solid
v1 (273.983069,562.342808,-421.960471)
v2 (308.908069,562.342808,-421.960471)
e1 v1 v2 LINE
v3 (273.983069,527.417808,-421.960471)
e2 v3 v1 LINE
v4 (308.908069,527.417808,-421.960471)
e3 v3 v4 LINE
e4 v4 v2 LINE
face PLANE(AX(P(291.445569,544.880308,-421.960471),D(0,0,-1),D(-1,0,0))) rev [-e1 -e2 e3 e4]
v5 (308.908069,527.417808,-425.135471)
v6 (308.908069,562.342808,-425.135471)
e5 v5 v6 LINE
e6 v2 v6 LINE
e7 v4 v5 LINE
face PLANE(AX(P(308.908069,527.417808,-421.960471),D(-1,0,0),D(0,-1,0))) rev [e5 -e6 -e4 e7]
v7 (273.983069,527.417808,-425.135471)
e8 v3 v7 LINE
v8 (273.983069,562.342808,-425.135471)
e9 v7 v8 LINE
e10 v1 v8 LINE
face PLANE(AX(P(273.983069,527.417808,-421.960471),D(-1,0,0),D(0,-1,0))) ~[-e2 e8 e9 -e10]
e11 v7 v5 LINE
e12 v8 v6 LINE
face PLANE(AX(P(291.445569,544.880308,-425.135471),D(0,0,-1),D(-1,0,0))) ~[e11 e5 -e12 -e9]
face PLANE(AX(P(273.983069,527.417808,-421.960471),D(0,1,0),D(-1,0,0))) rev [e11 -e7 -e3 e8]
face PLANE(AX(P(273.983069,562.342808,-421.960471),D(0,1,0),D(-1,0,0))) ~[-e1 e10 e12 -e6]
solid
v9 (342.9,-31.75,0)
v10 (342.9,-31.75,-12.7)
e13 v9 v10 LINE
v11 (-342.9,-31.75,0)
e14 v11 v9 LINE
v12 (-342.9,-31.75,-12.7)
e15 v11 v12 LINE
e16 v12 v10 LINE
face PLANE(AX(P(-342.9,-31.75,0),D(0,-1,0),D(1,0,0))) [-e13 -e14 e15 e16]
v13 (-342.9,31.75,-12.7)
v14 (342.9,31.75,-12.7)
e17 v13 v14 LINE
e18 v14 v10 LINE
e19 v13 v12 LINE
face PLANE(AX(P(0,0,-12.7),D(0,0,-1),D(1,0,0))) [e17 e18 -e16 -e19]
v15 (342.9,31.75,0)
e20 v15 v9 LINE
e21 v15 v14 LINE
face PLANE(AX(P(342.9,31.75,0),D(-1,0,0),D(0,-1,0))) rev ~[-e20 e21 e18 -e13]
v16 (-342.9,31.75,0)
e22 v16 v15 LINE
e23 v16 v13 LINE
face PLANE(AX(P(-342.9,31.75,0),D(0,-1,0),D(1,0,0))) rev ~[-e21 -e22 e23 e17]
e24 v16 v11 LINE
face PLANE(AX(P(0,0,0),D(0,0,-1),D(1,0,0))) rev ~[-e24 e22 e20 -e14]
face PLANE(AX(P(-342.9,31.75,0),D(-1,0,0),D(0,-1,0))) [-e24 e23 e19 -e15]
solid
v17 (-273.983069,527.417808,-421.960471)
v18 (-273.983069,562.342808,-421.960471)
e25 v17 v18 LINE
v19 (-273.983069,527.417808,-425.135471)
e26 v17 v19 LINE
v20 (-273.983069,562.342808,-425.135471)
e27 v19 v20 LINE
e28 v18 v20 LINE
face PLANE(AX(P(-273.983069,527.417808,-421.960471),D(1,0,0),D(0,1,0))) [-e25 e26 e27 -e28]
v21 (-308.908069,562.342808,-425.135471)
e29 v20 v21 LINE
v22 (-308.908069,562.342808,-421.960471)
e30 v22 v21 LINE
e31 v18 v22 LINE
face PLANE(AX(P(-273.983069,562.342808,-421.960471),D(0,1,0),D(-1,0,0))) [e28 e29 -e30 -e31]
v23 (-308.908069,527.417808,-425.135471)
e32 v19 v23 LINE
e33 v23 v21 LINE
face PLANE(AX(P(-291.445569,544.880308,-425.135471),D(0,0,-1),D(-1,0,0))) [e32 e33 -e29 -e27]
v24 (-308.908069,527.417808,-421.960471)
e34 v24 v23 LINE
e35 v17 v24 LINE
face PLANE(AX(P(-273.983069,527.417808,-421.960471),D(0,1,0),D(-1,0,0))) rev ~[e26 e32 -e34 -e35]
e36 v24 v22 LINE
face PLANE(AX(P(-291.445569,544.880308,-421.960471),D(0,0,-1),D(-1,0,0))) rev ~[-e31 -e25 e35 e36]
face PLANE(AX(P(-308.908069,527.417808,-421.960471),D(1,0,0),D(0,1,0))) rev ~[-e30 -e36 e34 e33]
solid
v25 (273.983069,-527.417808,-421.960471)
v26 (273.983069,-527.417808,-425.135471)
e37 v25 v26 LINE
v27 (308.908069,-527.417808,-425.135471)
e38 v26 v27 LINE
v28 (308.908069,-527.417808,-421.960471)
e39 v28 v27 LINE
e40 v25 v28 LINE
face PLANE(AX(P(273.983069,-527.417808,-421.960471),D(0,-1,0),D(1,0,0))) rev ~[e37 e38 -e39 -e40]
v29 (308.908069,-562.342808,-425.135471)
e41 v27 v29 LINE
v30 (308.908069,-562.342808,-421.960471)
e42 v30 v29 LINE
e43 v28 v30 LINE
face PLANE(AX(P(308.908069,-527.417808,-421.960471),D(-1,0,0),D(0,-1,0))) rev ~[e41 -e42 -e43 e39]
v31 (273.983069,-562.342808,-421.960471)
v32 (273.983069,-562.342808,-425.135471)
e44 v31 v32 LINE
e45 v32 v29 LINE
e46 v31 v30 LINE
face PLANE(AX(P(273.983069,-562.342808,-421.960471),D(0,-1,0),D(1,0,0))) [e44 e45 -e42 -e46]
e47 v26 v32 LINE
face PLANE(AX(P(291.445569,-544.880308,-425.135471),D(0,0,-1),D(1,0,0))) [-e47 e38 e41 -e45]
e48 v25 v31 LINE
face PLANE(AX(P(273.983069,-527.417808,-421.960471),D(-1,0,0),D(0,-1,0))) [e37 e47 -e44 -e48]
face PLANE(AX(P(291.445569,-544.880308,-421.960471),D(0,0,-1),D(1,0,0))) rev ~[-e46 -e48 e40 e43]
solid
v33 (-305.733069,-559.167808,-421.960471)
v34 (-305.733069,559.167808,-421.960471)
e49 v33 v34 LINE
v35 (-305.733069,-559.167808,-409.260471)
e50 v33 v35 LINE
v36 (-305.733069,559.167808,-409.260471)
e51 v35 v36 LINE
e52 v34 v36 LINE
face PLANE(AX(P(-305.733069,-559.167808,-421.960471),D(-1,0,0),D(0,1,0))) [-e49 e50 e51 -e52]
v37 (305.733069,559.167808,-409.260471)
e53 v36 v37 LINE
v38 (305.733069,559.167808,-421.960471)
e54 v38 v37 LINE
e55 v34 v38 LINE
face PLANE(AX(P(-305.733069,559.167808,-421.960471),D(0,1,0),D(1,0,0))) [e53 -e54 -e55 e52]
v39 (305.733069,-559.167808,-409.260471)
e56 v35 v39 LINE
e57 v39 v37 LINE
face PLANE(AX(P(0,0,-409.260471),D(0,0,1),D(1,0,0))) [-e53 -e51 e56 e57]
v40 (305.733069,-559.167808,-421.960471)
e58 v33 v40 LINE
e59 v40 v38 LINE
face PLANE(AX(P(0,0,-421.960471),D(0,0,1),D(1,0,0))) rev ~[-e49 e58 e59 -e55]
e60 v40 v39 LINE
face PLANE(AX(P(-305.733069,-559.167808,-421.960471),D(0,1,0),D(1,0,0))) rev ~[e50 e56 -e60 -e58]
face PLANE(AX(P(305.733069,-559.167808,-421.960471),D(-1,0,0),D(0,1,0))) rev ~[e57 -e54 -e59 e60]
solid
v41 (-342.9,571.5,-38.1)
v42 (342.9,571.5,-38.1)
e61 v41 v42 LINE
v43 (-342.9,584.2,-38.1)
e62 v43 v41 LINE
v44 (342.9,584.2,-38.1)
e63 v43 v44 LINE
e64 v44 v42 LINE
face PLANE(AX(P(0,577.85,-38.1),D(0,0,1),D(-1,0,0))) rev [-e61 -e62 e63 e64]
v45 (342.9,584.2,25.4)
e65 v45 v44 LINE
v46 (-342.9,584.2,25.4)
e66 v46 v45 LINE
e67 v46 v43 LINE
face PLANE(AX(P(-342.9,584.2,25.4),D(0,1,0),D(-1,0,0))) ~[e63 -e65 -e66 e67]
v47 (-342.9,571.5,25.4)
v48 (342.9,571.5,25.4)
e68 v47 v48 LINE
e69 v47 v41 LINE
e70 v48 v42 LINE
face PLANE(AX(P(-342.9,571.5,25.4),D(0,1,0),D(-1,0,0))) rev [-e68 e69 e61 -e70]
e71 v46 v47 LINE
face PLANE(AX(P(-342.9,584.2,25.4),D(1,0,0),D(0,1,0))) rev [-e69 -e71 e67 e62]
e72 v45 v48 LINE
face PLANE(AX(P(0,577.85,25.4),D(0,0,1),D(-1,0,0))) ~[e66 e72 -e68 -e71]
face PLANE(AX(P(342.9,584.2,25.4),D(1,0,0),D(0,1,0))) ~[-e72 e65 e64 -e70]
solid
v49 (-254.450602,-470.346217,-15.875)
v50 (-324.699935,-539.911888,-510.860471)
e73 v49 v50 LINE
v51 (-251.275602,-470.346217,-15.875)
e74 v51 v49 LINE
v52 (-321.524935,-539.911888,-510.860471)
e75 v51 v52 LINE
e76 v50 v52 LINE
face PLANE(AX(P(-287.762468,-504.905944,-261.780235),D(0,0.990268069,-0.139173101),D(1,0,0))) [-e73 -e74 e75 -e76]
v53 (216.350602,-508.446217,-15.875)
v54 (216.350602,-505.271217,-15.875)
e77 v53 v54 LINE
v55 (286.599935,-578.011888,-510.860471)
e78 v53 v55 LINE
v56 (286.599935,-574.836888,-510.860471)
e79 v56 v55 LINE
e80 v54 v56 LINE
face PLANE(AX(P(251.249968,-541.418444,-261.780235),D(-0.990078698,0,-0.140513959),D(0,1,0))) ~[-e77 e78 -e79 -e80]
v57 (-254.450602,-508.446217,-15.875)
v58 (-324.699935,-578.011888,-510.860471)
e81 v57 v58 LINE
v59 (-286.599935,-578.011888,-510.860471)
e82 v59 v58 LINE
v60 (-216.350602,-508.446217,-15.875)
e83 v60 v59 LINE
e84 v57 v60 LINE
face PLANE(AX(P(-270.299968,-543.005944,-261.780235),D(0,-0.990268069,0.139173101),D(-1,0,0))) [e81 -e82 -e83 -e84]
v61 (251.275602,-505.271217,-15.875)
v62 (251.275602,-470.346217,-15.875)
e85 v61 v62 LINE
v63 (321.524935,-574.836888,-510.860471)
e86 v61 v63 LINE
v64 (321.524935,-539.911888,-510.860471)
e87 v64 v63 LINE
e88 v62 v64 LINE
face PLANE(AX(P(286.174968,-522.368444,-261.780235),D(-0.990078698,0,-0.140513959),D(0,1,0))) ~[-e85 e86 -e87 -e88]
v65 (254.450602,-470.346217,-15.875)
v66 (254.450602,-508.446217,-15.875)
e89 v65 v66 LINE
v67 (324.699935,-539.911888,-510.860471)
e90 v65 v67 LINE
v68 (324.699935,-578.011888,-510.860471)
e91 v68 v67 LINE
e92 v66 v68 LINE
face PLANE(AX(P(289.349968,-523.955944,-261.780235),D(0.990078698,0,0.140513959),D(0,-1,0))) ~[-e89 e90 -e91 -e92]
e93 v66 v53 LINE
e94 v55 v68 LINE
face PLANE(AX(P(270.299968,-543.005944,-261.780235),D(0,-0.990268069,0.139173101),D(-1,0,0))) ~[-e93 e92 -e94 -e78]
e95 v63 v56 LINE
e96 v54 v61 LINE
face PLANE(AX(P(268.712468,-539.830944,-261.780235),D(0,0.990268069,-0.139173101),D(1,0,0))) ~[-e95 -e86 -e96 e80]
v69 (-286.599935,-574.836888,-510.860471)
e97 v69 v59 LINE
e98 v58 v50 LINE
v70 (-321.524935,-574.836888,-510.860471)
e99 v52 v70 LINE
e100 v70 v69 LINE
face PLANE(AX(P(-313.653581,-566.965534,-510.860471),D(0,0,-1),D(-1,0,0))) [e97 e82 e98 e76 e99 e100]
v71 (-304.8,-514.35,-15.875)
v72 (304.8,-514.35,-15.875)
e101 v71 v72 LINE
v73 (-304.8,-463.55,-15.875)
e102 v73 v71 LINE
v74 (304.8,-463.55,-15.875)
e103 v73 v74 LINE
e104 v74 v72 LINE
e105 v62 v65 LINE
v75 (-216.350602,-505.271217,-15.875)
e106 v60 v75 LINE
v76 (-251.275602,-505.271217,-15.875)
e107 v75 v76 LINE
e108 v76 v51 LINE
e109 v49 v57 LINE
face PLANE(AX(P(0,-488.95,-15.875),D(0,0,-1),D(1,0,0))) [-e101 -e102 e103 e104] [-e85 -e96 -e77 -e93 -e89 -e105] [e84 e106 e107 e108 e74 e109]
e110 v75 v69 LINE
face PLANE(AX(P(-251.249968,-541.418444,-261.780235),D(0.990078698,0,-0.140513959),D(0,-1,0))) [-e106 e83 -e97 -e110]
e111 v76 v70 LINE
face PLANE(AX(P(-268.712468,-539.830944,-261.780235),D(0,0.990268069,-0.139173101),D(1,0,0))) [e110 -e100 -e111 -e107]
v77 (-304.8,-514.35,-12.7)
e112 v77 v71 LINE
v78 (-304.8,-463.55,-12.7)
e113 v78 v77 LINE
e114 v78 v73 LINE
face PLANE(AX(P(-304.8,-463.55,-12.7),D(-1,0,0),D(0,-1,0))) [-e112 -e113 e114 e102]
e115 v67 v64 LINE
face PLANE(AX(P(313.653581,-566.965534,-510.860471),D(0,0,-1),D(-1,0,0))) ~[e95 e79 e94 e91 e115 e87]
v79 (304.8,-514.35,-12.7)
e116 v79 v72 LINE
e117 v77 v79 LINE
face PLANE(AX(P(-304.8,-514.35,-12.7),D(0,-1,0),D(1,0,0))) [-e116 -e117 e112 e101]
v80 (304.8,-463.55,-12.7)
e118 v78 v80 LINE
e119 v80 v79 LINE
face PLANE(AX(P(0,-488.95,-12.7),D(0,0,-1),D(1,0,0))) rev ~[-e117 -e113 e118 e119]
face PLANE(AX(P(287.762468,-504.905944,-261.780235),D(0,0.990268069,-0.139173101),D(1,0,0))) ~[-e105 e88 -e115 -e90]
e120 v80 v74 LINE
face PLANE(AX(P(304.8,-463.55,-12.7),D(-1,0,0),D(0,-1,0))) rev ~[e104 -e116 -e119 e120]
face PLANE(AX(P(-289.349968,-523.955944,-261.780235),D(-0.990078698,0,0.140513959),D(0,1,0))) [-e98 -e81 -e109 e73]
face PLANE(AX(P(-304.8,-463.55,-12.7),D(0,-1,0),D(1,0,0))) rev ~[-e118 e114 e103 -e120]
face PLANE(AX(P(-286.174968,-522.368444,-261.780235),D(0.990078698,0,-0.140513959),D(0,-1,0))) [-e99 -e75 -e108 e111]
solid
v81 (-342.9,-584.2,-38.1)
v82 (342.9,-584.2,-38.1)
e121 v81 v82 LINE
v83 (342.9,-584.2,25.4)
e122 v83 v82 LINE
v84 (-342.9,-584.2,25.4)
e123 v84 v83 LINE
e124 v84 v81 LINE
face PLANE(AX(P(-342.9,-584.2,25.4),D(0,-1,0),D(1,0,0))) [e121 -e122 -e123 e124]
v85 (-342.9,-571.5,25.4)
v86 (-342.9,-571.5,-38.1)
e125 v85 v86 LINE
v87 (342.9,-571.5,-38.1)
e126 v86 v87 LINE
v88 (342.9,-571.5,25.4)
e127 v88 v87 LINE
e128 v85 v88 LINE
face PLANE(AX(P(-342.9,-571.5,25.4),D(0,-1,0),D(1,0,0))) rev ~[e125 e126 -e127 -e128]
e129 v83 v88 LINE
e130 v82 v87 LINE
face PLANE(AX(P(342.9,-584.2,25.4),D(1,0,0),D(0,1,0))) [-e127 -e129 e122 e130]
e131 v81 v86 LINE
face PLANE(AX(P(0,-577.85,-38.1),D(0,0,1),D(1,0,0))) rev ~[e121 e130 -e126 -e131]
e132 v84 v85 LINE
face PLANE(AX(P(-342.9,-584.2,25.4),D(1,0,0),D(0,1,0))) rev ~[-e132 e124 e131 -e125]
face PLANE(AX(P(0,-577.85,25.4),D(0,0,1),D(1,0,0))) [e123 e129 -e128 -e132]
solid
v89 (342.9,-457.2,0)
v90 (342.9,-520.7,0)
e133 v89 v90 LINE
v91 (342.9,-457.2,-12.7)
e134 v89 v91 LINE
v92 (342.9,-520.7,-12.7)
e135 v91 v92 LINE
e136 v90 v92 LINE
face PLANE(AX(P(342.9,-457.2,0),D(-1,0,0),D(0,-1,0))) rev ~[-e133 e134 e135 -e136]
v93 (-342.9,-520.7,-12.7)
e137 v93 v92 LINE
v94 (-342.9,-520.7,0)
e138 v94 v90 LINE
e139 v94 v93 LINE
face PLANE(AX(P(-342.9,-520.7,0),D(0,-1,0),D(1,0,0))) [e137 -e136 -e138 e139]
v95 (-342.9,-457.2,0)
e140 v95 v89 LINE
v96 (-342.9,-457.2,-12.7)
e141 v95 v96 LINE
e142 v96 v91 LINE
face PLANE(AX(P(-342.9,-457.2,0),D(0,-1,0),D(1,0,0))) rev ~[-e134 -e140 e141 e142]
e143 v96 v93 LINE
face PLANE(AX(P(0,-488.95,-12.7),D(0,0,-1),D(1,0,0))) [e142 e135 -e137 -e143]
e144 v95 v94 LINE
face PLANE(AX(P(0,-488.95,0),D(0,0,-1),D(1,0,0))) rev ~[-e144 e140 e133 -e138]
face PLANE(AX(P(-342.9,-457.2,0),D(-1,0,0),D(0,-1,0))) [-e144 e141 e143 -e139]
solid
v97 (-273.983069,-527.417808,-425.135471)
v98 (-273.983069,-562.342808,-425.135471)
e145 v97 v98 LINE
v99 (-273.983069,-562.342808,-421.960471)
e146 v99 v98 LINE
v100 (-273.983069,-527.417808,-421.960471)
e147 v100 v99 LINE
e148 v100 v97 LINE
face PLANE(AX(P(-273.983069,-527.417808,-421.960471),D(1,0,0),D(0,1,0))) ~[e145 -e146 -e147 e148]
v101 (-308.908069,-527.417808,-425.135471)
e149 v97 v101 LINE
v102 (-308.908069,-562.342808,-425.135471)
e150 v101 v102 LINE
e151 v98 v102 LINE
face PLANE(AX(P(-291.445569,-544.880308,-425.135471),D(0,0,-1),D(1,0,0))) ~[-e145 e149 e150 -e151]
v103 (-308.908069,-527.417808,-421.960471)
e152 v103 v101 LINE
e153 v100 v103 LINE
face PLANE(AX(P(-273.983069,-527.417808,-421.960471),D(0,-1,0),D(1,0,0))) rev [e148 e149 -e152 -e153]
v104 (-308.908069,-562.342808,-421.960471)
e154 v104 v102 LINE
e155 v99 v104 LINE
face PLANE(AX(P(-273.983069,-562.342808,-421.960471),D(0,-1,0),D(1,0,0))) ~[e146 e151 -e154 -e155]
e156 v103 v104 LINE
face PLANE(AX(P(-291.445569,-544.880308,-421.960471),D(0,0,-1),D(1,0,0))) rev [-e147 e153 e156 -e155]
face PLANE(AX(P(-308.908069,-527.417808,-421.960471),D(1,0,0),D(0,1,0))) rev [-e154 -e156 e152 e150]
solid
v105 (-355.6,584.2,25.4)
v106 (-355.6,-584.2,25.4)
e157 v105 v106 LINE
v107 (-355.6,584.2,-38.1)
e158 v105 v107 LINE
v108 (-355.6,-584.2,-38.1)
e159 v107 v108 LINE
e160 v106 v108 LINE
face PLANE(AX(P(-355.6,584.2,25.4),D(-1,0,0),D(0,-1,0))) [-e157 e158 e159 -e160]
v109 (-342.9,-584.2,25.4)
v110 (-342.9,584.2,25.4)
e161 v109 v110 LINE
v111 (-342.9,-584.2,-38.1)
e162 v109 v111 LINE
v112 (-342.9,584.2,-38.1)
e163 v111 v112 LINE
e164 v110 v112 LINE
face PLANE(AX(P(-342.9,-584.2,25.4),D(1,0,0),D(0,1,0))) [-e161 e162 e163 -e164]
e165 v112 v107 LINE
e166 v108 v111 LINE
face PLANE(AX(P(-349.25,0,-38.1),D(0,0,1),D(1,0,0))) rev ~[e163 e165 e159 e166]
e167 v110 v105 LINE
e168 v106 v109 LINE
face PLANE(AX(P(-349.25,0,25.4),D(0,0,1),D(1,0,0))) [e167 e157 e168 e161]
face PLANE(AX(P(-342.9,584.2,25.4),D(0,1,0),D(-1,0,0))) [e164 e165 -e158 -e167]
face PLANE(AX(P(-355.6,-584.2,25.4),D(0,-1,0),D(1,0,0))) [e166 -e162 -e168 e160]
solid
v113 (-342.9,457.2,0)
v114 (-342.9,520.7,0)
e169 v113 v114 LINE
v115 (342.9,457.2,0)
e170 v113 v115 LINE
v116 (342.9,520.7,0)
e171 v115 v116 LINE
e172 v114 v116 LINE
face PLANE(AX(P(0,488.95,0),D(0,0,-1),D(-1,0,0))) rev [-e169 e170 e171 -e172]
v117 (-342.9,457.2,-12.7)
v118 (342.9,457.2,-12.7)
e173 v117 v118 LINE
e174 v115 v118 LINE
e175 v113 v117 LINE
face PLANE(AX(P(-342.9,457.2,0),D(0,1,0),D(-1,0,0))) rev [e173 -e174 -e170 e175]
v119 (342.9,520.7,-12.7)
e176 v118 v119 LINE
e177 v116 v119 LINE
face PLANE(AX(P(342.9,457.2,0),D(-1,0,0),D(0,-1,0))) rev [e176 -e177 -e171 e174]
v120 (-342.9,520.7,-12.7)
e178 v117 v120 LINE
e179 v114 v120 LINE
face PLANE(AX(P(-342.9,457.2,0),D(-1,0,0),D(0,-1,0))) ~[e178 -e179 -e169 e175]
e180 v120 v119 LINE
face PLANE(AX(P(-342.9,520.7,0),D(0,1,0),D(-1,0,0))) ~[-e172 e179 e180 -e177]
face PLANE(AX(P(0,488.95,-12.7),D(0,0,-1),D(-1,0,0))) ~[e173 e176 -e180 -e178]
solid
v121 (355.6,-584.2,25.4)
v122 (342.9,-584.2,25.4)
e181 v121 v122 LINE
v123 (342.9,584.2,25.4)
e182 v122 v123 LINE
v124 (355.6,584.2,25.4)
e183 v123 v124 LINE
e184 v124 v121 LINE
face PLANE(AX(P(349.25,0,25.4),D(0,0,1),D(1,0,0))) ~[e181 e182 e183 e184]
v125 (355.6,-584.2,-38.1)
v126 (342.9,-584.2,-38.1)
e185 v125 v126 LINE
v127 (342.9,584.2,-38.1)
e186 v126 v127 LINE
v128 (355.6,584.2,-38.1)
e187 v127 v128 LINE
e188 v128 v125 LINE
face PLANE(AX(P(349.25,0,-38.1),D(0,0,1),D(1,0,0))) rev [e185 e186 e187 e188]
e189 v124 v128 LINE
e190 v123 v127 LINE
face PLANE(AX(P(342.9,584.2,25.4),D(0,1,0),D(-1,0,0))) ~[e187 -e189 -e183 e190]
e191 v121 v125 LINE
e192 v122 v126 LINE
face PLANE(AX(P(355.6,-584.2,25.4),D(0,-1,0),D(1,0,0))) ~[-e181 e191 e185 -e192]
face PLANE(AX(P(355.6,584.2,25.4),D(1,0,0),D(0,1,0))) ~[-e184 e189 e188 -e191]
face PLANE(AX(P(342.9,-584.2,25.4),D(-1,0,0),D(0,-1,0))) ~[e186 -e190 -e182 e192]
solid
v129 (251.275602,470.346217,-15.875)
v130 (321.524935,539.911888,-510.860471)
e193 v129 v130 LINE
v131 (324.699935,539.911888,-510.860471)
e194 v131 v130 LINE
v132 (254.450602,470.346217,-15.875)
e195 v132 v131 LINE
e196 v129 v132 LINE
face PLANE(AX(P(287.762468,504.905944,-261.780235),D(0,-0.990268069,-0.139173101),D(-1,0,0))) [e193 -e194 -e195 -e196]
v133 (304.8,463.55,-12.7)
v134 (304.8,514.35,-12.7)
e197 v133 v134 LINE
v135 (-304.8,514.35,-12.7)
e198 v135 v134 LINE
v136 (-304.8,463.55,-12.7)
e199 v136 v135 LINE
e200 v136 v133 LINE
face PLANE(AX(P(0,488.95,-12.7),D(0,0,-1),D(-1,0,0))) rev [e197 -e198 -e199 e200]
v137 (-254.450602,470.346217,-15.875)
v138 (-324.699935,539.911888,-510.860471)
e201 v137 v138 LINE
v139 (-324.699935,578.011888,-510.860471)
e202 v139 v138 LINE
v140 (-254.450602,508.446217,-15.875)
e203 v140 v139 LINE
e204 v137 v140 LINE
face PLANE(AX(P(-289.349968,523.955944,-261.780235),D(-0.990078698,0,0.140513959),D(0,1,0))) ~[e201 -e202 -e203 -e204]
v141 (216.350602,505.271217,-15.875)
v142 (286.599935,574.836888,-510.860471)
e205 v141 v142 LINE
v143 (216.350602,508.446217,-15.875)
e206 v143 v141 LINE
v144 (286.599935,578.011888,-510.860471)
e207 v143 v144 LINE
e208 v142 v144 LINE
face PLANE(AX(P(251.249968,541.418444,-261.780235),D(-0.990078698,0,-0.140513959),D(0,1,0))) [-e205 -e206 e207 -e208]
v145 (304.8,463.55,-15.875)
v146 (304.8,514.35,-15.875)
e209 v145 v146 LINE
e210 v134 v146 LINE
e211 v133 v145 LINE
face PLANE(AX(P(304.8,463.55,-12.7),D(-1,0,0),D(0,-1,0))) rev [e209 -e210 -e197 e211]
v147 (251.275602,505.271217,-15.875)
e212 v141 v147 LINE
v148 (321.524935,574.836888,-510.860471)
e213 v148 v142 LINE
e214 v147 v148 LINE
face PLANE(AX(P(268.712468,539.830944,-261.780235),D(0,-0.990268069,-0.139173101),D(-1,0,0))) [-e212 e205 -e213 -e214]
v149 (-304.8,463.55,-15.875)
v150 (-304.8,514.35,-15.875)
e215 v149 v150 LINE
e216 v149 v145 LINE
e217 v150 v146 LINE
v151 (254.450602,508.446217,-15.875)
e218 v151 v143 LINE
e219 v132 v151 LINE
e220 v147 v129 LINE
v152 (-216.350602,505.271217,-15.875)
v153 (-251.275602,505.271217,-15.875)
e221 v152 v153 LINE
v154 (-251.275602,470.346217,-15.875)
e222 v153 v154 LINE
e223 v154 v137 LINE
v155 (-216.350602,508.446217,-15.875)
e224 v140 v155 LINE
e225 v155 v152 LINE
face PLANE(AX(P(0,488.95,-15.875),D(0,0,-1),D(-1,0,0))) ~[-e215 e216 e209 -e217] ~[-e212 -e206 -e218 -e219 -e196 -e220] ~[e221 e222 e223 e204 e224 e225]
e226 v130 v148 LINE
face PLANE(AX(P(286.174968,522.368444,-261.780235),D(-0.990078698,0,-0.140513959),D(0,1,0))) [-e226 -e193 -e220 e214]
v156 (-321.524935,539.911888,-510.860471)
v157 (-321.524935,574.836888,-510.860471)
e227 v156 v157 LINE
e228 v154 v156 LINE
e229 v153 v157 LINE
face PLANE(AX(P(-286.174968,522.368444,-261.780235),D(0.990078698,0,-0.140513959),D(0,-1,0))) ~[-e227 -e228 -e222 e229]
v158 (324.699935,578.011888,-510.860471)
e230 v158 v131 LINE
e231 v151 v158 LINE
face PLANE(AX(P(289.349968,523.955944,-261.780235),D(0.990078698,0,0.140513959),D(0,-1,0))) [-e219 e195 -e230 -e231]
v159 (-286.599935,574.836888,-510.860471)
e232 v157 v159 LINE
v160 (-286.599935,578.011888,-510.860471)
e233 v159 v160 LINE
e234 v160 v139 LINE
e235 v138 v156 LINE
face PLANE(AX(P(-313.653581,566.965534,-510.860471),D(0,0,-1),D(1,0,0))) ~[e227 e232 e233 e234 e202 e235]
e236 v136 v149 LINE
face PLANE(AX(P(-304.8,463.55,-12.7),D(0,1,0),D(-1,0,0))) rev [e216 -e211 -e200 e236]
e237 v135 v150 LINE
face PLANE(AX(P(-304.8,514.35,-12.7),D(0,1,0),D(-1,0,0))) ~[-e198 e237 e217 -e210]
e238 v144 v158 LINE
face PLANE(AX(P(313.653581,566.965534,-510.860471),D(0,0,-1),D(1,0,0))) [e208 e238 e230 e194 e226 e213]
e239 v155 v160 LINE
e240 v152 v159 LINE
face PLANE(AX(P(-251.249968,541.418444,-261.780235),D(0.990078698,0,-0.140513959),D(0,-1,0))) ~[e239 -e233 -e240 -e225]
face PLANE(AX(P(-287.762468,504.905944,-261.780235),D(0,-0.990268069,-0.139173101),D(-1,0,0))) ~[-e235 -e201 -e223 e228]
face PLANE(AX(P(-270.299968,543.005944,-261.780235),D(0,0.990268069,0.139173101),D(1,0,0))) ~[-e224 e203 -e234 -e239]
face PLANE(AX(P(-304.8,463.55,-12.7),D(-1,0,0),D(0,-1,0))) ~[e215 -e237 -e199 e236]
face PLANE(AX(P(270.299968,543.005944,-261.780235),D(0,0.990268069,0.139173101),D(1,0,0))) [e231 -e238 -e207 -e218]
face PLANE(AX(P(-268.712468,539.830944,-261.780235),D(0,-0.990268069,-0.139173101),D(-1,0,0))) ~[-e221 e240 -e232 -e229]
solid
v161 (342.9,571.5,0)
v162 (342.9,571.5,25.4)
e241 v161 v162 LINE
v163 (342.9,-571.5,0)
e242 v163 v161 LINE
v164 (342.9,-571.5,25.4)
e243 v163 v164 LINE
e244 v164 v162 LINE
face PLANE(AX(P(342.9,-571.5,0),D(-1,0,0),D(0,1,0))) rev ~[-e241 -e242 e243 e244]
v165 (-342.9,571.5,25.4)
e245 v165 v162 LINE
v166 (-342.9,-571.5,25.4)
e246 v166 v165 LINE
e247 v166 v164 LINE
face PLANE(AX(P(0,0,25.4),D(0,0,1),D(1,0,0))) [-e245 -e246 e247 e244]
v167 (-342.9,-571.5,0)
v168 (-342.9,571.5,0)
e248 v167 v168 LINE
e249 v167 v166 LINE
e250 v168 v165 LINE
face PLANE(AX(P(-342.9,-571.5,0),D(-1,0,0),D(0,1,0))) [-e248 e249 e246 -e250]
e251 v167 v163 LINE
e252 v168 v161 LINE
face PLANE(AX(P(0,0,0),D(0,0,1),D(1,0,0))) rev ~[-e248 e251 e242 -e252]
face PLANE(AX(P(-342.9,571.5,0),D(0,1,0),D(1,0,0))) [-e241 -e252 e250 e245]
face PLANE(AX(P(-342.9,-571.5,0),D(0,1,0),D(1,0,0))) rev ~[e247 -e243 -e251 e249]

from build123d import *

# Parameters (mm, degrees)
F0_W      = 685.8
F0_H      = 1143
F1_DEPTH  = 25.4
F2_W      = 685.8
F2_H      = 12.7
F3_DEPTH  = 63.5
F4_DEPTH  = 63.5
F7_W      = 685.8
F7_H      = 63.5
F8_DEPTH  = 12.7
F13_W     = 609.6
F13_H     = 50.8
F14_DEPTH = 3.175
F18_DEPTH = 3.175
F21_W     = 34.925
F21_H     = 34.925
F22_DEPTH = 3.175
F25_W     = 611.4661372068
F25_H     = 1118.335616345
F26_DEPTH = 12.7


# Not quite as in the source:
# - a feature of the source that left no trace in its solid (it failed there, or was rolled back) is left out


with BuildPart() as f1:
    # F0 (on Top) → F1 (new body)
    with BuildSketch(Plane.XY):
        Rectangle(F0_W, F0_H)
    extrude(amount=F1_DEPTH)


with BuildPart() as f3:
    # F2 (on face) → F3 (new body)
    with BuildSketch(Plane.XY.offset(25.4)):
        with Locations((0, -577.85)):
            Rectangle(F2_W, F2_H)
    extrude(amount=-F3_DEPTH)


with BuildPart() as f4:
    # F2 (on face) → F4 (new body)
    with BuildSketch(Plane.XY.offset(25.4)):
        Polygon((-342.9, -584.2), (-342.9, -571.5), (-342.9, 571.5), (-342.9, 584.2), (-355.6, 584.2), (-355.6, -584.2), align=None)
    extrude(amount=-F4_DEPTH)


with BuildPart() as f5_1:
    # F5: instance of F4
    add(f4.part.mirror(Plane.YZ))


with BuildPart() as f6_1:
    # F6: instance of F3
    add(f3.part.mirror(Plane.XZ))


with BuildPart() as f8:
    # F7 (on face) → F8 (new body)
    with BuildSketch(Plane(origin=(0, 0, 0), x_dir=(1, 0, 0), z_dir=(0, 0, -1))):
        with Locations((0, 488.95)):
            Rectangle(F7_W, F7_H)
    extrude(amount=F8_DEPTH)


with BuildPart() as f8b:
    # F7 (on face) → F8, piece 2 (new body)
    with BuildSketch(Plane(origin=(0, 0, 0), x_dir=(1, 0, 0), z_dir=(0, 0, -1))):
        Rectangle(F7_W, F7_H)
    extrude(amount=F8_DEPTH)


with BuildPart() as f12:
    # F12: sweep along a path in F11
    with BuildLine(Plane(origin=(0, -496.4101735589, 69.7659001467), x_dir=(1, 0, 0), z_dir=(0, -0.9902680687, 0.139173101))) as f12_path:
        Line((-254, -83.2763397607), (-324.6999352877, -586.3325186814))
    # F9 (on face) → F12 (sweep)
    with BuildSketch(Plane(origin=(0, 0, -12.7), x_dir=(1, 0, 0), z_dir=(0, 0, -1))):
        Polygon((-254, 508), (-254, 469.9), (-250.825, 469.9), (-250.825, 504.825), (-215.9, 504.825), (-215.9, 508), align=None)
    sweep(path=f12_path.line)

    # F13 (on face) → F14 (join)
    with BuildSketch(Plane(origin=(0, 0, -12.7), x_dir=(1, 0, 0), z_dir=(0, 0, -1))):
        with Locations((0, 488.95)):
            Rectangle(F13_W, F13_H)
    extrude(amount=F14_DEPTH)

    # F16: F12 across plane


with BuildPart() as f12_1:
    add(f12.part)
    add(f12.part.mirror(Plane.YZ))


with BuildPart() as f18:
    # F17 (on face) → F18 (new body)
    with BuildSketch(Plane(origin=(0, -493.2966706166, 69.3283258444), x_dir=(-1, 0, 0), z_dir=(0, 0.9902680687, -0.139173101))):
        Polygon((297.1001110228, -412.0989890367), (-263.6480910569, -174.0754990191), (-267.1830878213, -199.2283079651), (301.0836328718, -440.4432197893), align=None)
    extrude(amount=F18_DEPTH)


with BuildPart() as f19_1:
    # F19: instance of F18
    add(f18.part.mirror(Plane.YZ))


with BuildPart() as f22:
    # F21 (on offset) → F22 (new body)
    with BuildSketch(Plane(origin=(0, 0, -421.9604707683), x_dir=(1, 0, 0), z_dir=(0, 0, -1))):
        with Locations((291.4455686034, 544.8803081725)):
            Rectangle(F21_W, F21_H)
    extrude(amount=F22_DEPTH)


with BuildPart() as f23_1:
    # F23: instance of F22
    add(f22.part.mirror(Plane.YZ))


with BuildPart() as f24_1:
    # F24: instance of F8
    add(f8.part.mirror(Plane.XZ))


with BuildPart() as f24_2:
    # F24: instance of F12
    add(f12_1.part.mirror(Plane.XZ))


with BuildPart() as f24_3:
    # F24: instance of F19_1
    add(f19_1.part.mirror(Plane.XZ))


with BuildPart() as f24_4:
    # F24: instance of F18
    add(f18.part.mirror(Plane.XZ))


with BuildPart() as f24_5:
    # F24: instance of F23_1
    add(f23_1.part.mirror(Plane.XZ))


with BuildPart() as f24_6:
    # F24: instance of F22
    add(f22.part.mirror(Plane.XZ))


with BuildPart() as f26:
    # F25 (on face) → F26 (new body)
    with BuildSketch(Plane.XY.offset(-421.9604707683)):
        Rectangle(F25_W, F25_H)
    extrude(amount=F26_DEPTH)


solid = Compound([f1.part, f3.part, f4.part, f5_1.part, f6_1.part, f8.part, f8b.part, f12_1.part, f22.part, f23_1.part, f24_1.part, f24_2.part, f24_5.part, f24_6.part, f26.part])
